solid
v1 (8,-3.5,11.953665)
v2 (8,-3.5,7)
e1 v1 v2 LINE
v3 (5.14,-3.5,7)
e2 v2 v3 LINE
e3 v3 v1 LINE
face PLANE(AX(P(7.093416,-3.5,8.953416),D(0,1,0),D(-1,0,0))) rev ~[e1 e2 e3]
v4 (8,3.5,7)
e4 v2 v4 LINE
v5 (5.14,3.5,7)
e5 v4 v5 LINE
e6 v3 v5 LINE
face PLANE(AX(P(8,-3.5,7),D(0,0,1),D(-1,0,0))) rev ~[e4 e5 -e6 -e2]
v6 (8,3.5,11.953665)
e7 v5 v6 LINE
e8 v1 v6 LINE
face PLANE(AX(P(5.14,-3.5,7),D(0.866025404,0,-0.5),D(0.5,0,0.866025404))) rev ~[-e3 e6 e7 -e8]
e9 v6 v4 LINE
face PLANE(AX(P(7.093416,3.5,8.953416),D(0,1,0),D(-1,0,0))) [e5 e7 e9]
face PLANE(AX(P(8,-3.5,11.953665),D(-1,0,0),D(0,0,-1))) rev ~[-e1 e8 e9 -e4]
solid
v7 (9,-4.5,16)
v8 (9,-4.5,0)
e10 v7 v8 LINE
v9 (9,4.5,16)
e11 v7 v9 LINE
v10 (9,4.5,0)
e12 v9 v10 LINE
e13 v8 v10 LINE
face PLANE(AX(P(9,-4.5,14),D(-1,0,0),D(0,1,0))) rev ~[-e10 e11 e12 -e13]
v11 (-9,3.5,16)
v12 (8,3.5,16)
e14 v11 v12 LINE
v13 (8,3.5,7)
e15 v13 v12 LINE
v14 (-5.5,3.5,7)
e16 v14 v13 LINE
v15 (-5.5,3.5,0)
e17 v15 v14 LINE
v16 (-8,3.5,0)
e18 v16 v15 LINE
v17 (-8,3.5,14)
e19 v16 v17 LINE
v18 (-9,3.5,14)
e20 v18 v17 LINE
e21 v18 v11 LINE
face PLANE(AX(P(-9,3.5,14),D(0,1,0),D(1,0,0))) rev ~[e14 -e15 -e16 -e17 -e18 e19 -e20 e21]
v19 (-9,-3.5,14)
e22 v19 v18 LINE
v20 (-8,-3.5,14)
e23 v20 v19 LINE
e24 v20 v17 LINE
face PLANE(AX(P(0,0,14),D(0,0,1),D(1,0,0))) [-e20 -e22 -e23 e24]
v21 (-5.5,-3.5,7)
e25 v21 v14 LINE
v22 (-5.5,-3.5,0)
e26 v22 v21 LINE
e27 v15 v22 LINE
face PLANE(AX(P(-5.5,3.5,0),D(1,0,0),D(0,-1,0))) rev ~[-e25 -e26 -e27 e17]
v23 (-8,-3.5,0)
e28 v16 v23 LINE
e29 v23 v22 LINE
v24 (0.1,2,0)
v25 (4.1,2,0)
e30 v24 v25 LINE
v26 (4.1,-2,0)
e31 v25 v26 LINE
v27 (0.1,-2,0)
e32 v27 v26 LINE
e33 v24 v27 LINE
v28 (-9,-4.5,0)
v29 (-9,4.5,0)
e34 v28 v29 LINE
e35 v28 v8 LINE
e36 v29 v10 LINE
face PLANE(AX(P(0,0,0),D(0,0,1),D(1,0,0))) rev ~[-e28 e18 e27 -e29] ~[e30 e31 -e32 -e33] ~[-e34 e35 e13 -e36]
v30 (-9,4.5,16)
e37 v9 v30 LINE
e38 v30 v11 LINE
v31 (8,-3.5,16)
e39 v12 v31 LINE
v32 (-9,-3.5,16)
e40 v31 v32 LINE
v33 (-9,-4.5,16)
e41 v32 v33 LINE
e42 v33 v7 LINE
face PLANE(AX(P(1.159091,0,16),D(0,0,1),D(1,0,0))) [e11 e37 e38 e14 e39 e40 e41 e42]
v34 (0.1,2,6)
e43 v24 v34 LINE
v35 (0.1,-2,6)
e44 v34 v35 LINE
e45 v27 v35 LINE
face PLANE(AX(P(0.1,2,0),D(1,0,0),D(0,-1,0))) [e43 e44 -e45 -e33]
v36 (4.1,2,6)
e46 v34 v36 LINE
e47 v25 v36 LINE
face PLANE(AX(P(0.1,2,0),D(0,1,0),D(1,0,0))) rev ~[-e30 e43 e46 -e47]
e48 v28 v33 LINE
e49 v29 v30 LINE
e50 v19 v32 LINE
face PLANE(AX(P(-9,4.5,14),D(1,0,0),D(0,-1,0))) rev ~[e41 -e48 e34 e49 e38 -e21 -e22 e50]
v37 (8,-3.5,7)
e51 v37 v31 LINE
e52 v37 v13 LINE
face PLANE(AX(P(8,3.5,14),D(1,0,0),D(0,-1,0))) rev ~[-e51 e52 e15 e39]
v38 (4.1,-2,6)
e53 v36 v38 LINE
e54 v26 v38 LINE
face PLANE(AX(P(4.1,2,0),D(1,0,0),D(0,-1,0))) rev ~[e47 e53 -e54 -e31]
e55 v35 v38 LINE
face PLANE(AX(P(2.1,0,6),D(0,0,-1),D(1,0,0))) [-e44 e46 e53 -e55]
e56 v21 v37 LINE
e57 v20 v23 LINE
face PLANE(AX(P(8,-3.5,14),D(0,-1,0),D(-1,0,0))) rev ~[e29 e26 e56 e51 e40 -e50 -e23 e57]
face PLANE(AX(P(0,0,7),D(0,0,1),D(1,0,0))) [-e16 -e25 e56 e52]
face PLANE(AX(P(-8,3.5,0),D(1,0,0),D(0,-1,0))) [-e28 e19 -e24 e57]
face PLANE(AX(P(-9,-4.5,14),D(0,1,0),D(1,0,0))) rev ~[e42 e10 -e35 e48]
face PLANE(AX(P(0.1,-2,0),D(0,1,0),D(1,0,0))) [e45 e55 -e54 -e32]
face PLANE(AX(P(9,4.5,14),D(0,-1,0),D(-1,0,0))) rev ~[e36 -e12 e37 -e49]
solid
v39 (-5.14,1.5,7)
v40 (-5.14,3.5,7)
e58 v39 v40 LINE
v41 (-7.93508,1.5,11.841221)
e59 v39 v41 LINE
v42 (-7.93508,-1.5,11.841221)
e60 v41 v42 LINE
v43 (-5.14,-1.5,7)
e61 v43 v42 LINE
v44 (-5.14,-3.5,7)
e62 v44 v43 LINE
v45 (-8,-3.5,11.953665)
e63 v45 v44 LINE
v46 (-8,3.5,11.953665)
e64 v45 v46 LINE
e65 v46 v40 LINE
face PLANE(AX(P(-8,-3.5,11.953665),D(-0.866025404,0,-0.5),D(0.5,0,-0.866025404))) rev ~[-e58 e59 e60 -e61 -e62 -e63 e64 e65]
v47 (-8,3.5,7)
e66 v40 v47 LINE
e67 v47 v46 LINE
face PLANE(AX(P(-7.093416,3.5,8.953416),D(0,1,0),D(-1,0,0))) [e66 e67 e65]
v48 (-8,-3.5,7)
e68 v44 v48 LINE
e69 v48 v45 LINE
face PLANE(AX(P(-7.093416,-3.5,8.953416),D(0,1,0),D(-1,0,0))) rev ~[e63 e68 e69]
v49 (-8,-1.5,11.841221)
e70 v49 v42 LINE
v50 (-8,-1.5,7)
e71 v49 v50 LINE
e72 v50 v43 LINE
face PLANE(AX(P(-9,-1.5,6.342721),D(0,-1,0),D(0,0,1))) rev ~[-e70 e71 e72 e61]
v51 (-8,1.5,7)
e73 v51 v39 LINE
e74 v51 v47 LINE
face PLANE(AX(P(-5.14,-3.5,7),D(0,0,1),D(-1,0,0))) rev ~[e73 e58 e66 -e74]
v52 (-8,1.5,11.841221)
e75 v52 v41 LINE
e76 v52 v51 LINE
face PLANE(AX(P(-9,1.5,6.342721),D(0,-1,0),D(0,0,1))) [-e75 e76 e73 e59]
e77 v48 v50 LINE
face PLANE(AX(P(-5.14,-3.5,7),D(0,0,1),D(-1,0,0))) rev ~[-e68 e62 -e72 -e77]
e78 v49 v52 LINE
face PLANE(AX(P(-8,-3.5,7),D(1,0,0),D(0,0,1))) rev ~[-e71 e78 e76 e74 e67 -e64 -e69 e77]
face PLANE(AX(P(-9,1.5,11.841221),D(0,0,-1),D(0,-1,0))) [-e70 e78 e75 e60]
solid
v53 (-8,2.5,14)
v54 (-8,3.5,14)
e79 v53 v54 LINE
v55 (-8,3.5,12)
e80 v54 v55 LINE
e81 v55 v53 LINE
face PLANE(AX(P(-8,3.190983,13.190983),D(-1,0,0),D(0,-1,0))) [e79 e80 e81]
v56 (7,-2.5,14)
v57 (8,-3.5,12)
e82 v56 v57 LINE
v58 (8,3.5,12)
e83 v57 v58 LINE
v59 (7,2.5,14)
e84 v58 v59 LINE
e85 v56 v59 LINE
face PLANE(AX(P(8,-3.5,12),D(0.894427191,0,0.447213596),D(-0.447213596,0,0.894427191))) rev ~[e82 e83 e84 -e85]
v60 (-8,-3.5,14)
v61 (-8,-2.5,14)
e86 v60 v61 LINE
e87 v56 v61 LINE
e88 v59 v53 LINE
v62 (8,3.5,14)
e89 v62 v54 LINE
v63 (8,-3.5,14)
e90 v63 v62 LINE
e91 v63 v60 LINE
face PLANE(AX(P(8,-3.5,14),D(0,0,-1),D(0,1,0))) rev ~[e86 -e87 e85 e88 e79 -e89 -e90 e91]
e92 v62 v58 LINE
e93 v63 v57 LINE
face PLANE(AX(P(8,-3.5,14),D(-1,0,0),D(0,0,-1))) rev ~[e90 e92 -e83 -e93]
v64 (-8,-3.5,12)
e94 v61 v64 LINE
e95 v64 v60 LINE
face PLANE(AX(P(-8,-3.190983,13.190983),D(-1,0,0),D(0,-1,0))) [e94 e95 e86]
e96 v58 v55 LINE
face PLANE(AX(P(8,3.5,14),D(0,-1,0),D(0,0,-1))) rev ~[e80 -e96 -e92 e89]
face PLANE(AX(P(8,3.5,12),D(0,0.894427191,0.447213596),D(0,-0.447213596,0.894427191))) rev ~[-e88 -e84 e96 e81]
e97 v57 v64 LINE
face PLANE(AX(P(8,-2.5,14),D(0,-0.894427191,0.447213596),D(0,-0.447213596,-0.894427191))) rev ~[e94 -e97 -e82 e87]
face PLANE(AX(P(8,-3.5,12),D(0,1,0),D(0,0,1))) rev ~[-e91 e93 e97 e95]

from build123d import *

# Parameters (mm, degrees)
F0_W      = 18
F0_H      = 9
F1_DEPTH  = 14
F2_W      = 16
F2_H      = 7
F3_DEPTH  = 7
F4_W      = 4
F4_H      = 4
F5_DEPTH  = 6
F4_W_2    = 2.5
F4_H_2    = 7
F6_DEPTH  = 9
F8_DEPTH  = 2
F10_DEPTH = 7
F12_DEPTH = 16
F13_W     = 3
F13_H     = 5.4984997745
F14_DEPTH = 10


with BuildPart() as f1:
    # F0 (on Top) → F1 (new body)
    with BuildSketch(Plane.XY):
        Rectangle(F0_W, F0_H)
    extrude(amount=F1_DEPTH)

    # F2 (on face) → F3 (cut)
    with BuildSketch(Plane.XY.offset(14)):
        Rectangle(F2_W, F2_H)
    extrude(amount=-F3_DEPTH, mode=Mode.SUBTRACT)

    # F4 (on face) → F5 (cut)
    with BuildSketch(Plane(origin=(0, 0, 0), x_dir=(1, 0, 0), z_dir=(0, 0, -1))):
        with Locations((2.1, 0)):
            Rectangle(F4_W, F4_H)
    extrude(amount=-F5_DEPTH, mode=Mode.SUBTRACT)

    # F4 (on face) → F6 (cut)
    with BuildSketch(Plane(origin=(0, 0, 0), x_dir=(1, 0, 0), z_dir=(0, 0, -1))):
        with Locations((-6.75, 0)):
            Rectangle(F4_W_2, F4_H_2)
    extrude(amount=-F6_DEPTH, mode=Mode.SUBTRACT)

    # F7 (on face) → F8 (join)
    with BuildSketch(Plane.XY.offset(14)):
        Polygon((9, 4.5), (-9, 4.5), (-9, 3.5), (8, 3.5), (8, -3.5), (-9, -3.5), (-9, -4.5), (9, -4.5), align=None)
    extrude(amount=F8_DEPTH)


with BuildPart() as f10:
    # F9 (on face) → F10 (new body)
    with BuildSketch(Plane(origin=(0, -3.5, 0), x_dir=(-1, 0, 0), z_dir=(0, 1, 0))):
        Polygon((-7, 14), (-8, 14), (-8, 12), align=None)
    extrude(amount=F10_DEPTH)

    # F11 (on face) → F12 (join)
    with BuildSketch(Plane(origin=(8, 0, 0), x_dir=(0, -1, 0), z_dir=(-1, 0, 0))):
        Polygon((3.5, 12), (3.5, 14), (2.5, 14), align=None)
        Polygon((-3.5, 12), (-2.5, 14), (-3.5, 14), align=None)
    extrude(amount=F12_DEPTH)


with BuildPart() as f10b:
    # F9 (on face) → F10, piece 2 (new body)
    with BuildSketch(Plane(origin=(0, -3.5, 0), x_dir=(-1, 0, 0), z_dir=(0, 1, 0))):
        Polygon((-8, 11.9536653096), (-8, 7), (-5.14, 7), align=None)
    extrude(amount=F10_DEPTH)


with BuildPart() as f10c:
    # F9 (on face) → F10, piece 3 (new body)
    with BuildSketch(Plane(origin=(0, -3.5, 0), x_dir=(-1, 0, 0), z_dir=(0, 1, 0))):
        Polygon((8, 7), (8, 11.9536653096), (5.14, 7), align=None)
    extrude(amount=F10_DEPTH)

    # F13 (on face) → F14 (cut)
    with BuildSketch(Plane(origin=(-9, 0, 0), x_dir=(0, -1, 0), z_dir=(-1, 0, 0))):
        with Locations((0, 9.0919707436)):
            Rectangle(F13_W, F13_H)
    extrude(amount=-F14_DEPTH, mode=Mode.SUBTRACT)


solid = Compound([f1.part, f10.part, f10b.part, f10c.part])
